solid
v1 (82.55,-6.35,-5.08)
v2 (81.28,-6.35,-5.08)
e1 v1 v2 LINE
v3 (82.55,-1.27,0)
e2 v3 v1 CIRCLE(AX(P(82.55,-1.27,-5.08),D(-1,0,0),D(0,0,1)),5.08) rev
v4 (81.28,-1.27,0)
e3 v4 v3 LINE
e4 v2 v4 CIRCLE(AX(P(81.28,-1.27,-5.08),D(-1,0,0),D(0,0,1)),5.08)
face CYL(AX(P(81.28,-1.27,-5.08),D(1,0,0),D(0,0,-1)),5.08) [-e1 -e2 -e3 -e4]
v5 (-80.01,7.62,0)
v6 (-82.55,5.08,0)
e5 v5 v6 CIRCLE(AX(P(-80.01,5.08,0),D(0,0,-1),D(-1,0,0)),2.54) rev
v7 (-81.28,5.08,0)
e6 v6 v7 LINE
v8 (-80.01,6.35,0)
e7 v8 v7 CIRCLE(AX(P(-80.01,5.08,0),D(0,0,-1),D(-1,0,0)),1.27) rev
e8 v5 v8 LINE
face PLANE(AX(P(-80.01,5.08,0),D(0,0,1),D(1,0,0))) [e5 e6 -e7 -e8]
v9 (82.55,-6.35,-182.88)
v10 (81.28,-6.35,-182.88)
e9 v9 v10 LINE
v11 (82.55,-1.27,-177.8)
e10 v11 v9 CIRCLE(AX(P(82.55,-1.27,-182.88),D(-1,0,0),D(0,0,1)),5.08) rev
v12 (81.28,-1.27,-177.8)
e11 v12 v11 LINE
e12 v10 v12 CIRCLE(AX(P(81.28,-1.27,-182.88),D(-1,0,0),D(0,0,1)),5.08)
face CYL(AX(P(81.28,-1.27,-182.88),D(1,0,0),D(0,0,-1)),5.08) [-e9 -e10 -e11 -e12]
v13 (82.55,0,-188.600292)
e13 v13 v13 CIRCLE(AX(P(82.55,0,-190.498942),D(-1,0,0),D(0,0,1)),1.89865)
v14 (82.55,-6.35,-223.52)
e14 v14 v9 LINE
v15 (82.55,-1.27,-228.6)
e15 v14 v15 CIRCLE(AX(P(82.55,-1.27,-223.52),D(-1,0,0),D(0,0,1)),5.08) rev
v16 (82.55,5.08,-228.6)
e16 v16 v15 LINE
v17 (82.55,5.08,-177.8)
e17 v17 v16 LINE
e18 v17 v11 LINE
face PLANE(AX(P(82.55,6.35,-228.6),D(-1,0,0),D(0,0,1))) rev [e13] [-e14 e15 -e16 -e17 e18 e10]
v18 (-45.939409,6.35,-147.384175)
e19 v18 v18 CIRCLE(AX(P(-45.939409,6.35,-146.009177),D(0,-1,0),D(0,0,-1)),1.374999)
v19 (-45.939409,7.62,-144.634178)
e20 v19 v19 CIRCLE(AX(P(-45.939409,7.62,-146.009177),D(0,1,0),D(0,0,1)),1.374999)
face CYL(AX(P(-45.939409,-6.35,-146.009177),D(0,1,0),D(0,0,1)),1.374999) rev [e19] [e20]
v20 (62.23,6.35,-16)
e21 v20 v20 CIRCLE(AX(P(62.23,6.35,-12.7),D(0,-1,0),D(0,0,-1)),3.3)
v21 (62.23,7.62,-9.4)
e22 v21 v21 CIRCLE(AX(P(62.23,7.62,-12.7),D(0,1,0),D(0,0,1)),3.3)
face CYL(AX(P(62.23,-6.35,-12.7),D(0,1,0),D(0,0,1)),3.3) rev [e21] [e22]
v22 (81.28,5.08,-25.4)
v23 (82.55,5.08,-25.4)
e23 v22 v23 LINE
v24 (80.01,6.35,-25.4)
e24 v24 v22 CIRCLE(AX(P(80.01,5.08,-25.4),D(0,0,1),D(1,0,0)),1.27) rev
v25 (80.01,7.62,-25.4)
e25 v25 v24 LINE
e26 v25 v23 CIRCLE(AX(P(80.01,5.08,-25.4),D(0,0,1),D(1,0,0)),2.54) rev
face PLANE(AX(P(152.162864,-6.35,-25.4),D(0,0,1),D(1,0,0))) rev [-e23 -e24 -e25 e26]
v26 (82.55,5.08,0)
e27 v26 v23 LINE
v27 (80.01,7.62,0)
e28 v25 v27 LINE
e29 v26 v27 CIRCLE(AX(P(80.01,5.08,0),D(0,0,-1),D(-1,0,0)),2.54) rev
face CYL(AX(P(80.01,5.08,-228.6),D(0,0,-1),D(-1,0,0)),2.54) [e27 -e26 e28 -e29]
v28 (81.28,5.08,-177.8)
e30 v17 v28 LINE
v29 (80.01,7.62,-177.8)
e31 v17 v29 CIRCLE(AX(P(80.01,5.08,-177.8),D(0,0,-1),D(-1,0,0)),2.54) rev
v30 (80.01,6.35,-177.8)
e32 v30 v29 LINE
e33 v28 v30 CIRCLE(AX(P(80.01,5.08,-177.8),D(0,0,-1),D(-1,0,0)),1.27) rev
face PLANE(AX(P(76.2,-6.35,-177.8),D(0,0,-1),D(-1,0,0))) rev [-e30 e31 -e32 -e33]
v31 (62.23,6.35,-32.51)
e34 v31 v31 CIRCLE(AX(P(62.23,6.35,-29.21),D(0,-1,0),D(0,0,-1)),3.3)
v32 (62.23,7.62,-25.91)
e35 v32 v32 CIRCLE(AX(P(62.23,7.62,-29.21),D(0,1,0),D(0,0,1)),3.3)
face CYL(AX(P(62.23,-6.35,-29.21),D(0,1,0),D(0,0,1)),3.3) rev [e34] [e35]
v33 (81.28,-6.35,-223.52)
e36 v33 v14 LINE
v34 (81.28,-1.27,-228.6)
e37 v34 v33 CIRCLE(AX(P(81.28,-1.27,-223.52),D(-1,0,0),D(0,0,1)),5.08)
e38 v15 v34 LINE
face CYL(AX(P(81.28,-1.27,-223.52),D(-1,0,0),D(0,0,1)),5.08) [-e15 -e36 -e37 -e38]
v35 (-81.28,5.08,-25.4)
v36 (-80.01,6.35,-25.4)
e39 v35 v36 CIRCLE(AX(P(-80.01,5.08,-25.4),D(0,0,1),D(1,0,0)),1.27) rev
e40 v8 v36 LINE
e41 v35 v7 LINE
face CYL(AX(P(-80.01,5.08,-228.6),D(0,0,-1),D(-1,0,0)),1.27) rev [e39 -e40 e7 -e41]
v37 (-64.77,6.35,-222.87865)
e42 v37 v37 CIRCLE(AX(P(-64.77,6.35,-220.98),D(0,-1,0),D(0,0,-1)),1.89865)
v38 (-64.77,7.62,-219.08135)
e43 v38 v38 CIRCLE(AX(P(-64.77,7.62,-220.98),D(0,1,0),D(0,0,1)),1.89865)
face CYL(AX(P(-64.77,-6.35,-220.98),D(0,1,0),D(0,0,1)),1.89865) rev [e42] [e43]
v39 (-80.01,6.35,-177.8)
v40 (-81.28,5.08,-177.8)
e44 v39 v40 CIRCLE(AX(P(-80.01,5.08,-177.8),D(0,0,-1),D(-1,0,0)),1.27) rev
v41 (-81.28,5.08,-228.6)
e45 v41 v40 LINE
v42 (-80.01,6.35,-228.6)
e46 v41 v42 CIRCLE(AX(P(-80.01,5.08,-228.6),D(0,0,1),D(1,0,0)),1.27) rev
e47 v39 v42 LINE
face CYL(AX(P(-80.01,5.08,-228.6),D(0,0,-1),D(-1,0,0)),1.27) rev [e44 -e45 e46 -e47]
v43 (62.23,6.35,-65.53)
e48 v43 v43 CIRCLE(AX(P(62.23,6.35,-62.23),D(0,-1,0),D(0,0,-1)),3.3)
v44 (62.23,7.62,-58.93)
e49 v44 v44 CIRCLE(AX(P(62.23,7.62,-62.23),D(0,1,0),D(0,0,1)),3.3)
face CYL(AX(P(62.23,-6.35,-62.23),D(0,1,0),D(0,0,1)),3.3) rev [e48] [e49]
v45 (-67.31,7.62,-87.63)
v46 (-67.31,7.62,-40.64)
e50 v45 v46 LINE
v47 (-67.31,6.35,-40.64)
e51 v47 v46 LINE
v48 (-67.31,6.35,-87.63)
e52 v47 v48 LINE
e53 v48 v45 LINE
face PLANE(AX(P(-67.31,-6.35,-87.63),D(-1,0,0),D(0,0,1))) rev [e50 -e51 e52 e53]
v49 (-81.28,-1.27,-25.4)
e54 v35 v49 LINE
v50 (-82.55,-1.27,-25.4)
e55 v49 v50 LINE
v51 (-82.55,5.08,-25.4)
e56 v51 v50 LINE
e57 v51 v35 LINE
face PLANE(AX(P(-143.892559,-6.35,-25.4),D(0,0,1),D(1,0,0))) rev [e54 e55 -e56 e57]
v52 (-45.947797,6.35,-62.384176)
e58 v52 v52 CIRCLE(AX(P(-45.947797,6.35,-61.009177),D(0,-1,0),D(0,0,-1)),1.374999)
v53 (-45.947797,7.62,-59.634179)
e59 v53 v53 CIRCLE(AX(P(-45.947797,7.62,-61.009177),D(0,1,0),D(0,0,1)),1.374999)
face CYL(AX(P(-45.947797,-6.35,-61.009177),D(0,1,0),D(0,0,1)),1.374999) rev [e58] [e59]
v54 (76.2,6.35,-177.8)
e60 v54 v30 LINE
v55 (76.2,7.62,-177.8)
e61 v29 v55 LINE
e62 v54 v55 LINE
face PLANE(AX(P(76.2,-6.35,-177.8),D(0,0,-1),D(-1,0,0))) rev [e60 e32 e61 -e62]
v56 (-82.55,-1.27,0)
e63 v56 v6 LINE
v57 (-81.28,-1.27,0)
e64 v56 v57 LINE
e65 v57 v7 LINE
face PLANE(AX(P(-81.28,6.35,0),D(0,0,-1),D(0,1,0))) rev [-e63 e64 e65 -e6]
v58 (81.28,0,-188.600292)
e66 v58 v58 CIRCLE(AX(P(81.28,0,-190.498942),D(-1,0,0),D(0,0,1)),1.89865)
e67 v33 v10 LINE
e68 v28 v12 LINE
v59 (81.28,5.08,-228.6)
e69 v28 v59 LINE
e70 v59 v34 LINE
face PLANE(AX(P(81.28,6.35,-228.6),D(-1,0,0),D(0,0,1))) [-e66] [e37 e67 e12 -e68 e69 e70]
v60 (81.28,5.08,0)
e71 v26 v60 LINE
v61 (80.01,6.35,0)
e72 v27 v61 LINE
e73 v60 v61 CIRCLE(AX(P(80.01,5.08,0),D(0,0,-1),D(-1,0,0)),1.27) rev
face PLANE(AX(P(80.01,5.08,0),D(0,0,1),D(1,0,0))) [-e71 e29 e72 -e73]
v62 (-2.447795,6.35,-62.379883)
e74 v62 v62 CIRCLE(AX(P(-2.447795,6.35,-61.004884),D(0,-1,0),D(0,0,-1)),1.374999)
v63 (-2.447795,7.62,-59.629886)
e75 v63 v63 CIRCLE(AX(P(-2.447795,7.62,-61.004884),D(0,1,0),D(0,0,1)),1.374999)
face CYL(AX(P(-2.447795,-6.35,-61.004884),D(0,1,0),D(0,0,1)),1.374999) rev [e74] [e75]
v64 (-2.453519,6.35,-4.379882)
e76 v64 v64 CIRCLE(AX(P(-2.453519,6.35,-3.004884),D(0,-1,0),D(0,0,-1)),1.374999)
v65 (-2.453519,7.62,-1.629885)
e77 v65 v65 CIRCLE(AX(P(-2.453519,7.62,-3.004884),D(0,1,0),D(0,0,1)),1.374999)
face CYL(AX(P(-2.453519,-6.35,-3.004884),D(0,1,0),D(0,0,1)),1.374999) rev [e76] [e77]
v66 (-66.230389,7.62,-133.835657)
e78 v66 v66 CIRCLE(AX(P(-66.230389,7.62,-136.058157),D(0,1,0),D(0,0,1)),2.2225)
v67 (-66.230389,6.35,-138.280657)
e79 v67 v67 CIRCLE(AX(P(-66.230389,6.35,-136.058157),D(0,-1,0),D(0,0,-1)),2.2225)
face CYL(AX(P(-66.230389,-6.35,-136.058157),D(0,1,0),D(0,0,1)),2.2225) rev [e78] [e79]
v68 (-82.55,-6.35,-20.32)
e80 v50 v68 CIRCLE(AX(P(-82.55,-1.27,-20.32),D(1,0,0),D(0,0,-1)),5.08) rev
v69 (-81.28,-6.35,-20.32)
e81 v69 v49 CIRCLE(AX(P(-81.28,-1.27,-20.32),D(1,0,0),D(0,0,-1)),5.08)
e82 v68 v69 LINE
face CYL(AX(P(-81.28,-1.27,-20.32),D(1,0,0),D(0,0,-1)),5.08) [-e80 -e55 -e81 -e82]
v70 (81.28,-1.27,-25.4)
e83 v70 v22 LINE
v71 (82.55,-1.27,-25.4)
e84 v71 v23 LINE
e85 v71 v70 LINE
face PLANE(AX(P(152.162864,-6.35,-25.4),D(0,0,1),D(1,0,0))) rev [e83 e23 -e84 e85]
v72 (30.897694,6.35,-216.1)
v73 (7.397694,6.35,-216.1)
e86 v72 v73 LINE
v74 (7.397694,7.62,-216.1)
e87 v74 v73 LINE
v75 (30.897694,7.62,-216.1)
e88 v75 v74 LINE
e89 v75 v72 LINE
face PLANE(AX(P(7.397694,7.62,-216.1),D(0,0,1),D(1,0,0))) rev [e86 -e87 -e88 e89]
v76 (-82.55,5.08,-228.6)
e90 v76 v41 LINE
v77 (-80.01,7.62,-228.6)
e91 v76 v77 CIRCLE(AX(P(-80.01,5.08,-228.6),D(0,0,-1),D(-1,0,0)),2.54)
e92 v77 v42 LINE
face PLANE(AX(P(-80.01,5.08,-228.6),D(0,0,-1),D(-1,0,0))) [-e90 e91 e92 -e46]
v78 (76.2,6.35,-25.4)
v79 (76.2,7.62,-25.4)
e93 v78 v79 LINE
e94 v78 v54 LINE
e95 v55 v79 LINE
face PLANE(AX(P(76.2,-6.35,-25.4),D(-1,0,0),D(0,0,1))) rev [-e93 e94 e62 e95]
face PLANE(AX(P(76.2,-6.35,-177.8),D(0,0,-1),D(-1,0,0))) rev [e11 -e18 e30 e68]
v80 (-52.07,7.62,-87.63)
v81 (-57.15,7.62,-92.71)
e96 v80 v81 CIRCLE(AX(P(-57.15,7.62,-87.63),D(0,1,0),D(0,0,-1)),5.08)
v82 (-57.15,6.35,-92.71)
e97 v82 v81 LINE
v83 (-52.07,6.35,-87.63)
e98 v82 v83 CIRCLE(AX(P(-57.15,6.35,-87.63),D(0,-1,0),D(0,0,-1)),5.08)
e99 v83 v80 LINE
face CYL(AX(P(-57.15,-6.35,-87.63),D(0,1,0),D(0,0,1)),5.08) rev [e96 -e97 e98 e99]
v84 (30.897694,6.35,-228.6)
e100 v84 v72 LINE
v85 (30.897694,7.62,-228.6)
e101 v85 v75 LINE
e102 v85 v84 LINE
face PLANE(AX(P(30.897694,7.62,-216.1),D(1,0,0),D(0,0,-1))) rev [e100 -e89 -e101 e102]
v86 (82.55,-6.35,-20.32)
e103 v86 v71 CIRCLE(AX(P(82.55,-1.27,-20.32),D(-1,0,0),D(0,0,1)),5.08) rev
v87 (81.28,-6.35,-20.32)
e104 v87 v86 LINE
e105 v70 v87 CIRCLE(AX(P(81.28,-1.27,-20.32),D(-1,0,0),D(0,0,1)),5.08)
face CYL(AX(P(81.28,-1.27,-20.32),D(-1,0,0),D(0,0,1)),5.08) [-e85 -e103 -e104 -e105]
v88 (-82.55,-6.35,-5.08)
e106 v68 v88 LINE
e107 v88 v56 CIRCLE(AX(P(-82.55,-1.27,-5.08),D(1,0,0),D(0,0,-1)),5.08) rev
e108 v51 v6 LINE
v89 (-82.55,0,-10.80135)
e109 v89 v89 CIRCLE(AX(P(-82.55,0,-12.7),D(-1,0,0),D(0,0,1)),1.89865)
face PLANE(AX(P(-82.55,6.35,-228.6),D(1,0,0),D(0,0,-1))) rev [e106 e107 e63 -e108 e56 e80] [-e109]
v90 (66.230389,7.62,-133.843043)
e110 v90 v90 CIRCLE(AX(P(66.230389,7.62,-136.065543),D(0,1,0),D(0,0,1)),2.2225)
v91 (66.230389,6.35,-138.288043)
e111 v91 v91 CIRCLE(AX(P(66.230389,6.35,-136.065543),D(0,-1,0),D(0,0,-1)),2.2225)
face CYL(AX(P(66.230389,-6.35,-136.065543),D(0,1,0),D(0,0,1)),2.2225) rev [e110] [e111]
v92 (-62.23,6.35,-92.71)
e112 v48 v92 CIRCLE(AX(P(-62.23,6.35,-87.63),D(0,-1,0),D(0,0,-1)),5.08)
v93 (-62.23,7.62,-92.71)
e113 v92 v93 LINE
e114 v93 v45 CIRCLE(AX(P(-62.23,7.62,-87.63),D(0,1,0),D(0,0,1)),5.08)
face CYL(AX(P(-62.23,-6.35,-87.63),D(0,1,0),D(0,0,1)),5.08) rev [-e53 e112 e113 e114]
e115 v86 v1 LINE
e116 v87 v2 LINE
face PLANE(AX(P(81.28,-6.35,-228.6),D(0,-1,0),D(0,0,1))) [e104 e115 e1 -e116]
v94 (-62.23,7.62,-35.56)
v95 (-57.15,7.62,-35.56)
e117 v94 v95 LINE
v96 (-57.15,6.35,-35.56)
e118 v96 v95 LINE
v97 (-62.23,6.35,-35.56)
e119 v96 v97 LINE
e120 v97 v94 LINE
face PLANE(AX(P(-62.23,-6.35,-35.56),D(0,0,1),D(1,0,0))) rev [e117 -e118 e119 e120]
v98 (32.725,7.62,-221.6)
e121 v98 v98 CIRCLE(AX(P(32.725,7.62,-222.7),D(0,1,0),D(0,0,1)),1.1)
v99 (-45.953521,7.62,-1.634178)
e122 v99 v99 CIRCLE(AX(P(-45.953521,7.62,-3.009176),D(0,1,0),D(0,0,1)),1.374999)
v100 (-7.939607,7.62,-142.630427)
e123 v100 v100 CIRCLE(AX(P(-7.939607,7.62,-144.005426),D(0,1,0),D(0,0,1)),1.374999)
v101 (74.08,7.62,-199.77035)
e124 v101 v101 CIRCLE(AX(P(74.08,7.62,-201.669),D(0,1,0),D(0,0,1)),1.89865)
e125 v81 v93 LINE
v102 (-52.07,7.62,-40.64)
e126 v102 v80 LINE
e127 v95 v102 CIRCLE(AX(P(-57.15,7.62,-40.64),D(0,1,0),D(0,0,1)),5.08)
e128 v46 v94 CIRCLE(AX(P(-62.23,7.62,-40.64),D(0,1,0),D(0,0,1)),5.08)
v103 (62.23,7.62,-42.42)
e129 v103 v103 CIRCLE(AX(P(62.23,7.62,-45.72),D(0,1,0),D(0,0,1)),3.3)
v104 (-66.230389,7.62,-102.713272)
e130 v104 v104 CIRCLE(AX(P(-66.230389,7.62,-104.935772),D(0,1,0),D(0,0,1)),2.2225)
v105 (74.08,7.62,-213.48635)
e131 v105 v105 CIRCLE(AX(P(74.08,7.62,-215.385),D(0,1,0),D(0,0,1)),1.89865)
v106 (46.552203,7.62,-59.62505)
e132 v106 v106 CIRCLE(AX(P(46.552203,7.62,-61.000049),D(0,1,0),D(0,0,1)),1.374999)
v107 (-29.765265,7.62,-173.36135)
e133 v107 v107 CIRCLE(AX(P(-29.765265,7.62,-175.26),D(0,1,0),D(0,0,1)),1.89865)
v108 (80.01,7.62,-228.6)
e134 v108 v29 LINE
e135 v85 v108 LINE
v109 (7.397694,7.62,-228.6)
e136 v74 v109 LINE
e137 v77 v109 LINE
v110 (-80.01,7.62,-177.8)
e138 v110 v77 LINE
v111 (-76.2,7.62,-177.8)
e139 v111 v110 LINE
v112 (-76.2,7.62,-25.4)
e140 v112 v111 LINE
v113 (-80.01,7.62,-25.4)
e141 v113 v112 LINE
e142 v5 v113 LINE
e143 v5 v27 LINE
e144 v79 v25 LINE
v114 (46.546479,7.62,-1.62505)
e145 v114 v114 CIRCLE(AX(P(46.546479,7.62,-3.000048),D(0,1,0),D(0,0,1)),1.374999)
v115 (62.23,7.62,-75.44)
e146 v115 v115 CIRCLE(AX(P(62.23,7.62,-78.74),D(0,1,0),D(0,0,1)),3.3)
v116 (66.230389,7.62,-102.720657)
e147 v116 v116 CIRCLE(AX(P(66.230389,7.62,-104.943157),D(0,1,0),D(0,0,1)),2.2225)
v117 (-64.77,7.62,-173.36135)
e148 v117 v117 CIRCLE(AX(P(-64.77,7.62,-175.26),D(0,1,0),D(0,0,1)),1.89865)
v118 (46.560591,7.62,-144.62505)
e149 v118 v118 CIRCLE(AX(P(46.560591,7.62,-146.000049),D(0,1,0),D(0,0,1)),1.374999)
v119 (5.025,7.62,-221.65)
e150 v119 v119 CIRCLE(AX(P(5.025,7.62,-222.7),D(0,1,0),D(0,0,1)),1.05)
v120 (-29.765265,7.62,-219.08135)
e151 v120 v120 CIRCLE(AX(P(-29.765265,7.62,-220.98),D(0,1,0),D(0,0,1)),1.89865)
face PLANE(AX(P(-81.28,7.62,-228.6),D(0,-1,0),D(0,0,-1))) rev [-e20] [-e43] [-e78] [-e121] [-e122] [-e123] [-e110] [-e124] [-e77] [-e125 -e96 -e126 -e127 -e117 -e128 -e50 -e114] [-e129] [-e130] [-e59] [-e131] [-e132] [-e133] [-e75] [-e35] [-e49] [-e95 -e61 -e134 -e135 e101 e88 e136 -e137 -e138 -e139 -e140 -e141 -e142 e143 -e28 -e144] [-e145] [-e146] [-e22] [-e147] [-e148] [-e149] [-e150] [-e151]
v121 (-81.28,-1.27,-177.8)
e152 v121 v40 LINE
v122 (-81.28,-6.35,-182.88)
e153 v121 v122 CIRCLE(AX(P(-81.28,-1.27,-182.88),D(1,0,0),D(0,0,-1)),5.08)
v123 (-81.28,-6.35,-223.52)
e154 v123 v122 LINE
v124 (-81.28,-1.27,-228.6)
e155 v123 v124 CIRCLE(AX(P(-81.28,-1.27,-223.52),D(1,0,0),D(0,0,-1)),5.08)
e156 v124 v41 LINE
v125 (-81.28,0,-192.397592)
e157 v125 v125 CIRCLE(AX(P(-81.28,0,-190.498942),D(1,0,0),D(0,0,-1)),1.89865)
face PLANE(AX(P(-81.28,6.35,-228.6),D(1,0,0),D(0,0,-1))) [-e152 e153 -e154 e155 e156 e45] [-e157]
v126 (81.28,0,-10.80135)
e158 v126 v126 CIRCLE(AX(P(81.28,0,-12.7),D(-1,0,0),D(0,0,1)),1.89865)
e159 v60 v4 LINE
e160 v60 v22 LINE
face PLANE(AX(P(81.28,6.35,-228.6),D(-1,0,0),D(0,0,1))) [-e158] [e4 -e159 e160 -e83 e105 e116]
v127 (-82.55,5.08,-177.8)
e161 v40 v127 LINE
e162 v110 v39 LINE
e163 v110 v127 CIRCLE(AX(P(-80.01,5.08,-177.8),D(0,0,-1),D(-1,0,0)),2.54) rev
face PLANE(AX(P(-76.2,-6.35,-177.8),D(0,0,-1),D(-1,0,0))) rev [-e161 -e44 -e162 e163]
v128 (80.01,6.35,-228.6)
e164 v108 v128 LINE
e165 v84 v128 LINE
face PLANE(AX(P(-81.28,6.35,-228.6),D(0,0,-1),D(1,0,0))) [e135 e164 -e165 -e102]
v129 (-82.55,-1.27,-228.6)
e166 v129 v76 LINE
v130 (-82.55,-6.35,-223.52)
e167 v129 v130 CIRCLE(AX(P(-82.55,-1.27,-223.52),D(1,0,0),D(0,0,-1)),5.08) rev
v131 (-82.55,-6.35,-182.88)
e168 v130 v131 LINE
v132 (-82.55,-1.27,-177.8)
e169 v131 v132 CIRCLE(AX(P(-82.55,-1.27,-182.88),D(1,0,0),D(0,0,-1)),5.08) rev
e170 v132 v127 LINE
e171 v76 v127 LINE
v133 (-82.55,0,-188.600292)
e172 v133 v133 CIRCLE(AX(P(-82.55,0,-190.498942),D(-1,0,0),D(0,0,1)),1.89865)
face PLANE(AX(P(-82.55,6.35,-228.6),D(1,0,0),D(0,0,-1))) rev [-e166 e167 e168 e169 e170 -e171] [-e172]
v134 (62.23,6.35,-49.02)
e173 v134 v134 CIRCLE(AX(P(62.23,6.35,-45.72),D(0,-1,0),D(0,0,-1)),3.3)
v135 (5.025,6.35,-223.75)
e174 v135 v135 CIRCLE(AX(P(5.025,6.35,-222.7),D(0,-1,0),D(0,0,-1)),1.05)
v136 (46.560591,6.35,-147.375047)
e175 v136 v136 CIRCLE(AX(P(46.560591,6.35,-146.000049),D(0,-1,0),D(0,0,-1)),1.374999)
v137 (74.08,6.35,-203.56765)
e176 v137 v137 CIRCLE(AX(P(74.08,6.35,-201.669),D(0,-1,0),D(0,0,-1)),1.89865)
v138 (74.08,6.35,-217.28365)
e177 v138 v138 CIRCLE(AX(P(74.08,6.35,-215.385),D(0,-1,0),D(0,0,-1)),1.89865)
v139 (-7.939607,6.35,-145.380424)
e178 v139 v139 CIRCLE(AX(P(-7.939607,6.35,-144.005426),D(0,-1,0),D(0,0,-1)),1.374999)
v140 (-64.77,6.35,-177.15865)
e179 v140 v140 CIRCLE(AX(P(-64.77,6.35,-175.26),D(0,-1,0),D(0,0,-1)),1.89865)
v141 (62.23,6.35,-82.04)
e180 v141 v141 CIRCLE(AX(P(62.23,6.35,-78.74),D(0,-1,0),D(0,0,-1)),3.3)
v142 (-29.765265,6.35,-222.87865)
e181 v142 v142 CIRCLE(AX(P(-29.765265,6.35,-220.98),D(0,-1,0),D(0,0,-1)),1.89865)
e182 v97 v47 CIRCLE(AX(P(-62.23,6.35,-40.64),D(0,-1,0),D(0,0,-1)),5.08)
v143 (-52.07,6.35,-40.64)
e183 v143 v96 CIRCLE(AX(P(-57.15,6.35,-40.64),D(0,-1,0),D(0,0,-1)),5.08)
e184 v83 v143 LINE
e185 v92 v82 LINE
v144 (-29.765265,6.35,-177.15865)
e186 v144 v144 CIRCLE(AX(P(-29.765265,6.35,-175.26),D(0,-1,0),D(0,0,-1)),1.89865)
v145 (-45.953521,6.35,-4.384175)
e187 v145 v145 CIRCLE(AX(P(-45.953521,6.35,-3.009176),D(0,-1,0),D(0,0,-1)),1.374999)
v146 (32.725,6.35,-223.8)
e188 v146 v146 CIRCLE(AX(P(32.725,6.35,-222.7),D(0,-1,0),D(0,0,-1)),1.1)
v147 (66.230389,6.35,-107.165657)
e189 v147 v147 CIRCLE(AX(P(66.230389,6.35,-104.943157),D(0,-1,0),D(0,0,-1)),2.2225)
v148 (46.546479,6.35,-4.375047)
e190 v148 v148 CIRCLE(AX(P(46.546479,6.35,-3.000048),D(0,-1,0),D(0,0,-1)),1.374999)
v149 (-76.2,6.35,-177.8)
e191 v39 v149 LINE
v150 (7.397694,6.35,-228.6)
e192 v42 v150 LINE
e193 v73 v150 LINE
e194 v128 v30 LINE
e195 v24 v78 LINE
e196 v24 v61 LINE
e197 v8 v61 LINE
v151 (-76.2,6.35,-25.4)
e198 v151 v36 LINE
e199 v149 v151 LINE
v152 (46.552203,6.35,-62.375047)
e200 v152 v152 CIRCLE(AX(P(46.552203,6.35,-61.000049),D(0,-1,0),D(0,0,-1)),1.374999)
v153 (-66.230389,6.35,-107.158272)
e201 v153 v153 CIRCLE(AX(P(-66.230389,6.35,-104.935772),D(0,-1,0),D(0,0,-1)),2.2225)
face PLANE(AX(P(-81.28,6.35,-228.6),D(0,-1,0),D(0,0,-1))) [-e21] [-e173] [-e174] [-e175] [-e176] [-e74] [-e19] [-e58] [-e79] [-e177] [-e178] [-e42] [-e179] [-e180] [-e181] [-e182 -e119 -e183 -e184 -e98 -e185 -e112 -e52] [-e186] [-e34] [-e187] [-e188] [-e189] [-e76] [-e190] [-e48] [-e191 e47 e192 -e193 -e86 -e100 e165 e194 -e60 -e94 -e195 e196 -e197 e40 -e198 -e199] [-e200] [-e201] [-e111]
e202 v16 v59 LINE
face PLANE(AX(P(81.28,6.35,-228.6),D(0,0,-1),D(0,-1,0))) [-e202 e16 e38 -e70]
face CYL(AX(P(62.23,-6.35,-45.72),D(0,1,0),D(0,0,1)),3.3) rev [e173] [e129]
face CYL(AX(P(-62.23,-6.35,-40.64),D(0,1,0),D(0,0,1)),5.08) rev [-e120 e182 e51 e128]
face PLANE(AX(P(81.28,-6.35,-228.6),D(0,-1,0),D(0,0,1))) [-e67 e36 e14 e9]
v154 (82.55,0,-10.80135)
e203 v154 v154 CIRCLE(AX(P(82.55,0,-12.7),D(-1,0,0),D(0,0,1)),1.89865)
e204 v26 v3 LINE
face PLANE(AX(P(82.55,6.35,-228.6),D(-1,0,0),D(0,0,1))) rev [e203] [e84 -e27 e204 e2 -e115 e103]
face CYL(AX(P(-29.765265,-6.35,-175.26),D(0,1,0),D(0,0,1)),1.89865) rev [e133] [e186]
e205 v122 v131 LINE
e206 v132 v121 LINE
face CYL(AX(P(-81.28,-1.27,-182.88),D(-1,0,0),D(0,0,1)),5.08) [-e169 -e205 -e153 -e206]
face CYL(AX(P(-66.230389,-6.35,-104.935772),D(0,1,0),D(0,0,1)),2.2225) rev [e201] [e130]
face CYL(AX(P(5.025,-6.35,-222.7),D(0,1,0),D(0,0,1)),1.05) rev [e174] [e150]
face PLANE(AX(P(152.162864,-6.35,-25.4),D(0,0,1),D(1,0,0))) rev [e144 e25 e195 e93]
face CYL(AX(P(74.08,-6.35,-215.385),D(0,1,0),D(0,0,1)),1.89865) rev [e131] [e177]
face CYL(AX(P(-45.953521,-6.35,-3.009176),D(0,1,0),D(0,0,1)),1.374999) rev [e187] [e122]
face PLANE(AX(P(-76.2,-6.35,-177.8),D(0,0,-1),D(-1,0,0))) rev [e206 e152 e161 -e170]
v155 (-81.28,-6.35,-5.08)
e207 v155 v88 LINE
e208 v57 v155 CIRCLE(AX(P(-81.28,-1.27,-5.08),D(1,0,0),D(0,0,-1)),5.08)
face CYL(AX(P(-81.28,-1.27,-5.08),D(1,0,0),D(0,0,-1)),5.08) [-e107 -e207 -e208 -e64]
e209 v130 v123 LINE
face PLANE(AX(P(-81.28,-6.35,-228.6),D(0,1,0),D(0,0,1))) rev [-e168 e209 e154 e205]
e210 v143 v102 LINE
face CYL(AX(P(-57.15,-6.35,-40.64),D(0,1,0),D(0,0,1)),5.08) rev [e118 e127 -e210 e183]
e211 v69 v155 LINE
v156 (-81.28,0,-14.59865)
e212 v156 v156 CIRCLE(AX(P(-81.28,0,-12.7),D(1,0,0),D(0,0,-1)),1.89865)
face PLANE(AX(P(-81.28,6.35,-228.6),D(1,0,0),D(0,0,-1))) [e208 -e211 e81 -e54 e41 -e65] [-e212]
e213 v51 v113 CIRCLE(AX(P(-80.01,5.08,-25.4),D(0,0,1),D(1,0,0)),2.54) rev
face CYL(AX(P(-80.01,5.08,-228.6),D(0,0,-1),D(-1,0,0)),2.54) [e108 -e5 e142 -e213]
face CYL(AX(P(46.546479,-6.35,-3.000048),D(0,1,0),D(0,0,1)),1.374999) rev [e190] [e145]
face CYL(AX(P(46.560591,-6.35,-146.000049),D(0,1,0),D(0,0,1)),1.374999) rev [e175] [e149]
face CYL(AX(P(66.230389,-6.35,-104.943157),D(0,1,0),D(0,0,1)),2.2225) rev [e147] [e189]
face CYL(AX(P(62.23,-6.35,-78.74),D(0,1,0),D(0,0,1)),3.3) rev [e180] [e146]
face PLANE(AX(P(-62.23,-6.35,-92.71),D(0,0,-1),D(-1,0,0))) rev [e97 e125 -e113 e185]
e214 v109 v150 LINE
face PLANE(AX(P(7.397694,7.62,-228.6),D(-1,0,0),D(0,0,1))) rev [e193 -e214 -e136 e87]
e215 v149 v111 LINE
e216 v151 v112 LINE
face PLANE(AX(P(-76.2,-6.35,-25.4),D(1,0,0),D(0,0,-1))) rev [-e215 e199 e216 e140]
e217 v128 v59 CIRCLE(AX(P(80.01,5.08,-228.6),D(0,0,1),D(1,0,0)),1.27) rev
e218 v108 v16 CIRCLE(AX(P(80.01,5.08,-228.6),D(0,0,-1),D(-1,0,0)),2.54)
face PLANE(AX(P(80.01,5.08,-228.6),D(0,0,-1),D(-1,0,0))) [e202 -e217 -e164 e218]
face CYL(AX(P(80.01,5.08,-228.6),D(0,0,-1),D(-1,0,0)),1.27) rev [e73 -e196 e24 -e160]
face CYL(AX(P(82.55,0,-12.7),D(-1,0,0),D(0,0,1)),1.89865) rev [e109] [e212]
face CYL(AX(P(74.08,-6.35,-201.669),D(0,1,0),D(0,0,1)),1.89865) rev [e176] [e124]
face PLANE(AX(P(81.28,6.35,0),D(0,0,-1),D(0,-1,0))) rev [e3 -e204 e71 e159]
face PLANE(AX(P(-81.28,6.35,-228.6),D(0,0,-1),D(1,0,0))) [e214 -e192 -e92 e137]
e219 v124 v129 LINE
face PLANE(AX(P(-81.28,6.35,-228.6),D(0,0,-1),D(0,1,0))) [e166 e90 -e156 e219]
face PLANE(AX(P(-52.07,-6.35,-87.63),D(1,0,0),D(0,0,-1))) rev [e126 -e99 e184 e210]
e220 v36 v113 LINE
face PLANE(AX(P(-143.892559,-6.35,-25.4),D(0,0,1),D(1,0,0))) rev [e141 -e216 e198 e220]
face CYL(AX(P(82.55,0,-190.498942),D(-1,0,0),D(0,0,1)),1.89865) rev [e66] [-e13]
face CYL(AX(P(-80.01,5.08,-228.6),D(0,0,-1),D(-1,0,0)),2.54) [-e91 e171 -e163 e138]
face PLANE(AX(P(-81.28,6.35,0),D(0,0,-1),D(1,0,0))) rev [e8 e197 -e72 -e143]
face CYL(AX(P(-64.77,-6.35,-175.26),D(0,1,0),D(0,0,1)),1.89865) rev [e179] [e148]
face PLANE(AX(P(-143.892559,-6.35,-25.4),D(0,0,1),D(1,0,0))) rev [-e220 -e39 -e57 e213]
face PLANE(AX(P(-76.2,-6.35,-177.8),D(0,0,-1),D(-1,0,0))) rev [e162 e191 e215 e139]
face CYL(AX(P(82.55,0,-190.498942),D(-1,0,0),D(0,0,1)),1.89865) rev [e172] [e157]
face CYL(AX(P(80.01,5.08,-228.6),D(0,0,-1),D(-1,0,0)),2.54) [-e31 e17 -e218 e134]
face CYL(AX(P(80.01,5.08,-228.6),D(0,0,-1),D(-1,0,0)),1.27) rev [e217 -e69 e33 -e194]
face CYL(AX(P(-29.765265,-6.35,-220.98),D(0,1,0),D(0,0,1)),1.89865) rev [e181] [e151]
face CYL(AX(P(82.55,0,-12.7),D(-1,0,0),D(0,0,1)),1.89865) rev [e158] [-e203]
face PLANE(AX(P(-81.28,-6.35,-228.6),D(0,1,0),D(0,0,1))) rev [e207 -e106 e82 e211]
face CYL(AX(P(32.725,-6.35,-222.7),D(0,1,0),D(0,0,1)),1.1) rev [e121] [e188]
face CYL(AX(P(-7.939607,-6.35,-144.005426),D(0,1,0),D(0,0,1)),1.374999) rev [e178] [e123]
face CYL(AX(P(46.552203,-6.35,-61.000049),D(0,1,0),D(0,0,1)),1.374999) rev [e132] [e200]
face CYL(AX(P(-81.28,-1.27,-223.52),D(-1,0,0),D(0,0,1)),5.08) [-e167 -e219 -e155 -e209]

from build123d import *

# Parameters (mm, degrees)
BOSS_EXTRUDE1_DEPTH    = 228.6
CONVERT_SOLID1_START   = -228.6
CONVERT_SOLID1_DEPTH   = 228.6
CONVERT_SOLID1_2_DEPTH = 228.6
SKETCH2_W              = 67.692558519
SKETCH2_H              = 152.4
SKETCH2_W_2            = 75.962864449
CUT_EXTRUDE1_DEPTH     = 244.449426781
SKETCH3_R              = 1.89865
CUT_EXTRUDE2_DEPTH     = 283.088699526
SKETCH4_R              = 2.2225
SKETCH4_R_2            = 1.89865
CUT_EXTRUDE3_DEPTH     = 244.449426781
SKETCH5_R              = 1.89865
CUT_EXTRUDE4_DEPTH     = 244.449426781
CUT_EXTRUDE5_DEPTH     = 244.379852289
SKETCH7_R              = 1.1
SKETCH7_R_2            = 1.05
CUT_EXTRUDE6_DEPTH     = 244.449426781
SKETCH8_R              = 1.37499852
CUT_EXTRUDE7_DEPTH     = 244.449426781
CUT_EXTRUDE8_DEPTH     = 244.449426781
SKETCH10_R             = 3.3
CUT_EXTRUDE9_DEPTH     = 244.449426781
FILLET1_R              = 5.08


# Read off the part's stored shape, not the designer's step: Convert-Solid1
with BuildPart() as part:
    # Sketch1 → Boss-Extrude1 (new body)
    with BuildSketch(Plane.XY):
        Polygon((82.55, 7.62), (82.55, -6.35), (81.28, -6.35), (81.28, 6.35), (-81.28, 6.35), (-81.28, -6.35), (-82.55, -6.35), (-82.55, 7.62), align=None)
    extrude(amount=-BOSS_EXTRUDE1_DEPTH)

    # Convert-Solid1 outline → Convert-Solid1 (cut)
    with BuildSketch(Plane.XY.offset(CONVERT_SOLID1_START)):
        with BuildLine():
            Line((82.55, 7.62), (80.01, 7.62))
            ThreePointArc((80.01, 7.62), (81.806051224, 6.876051224), (82.55, 5.08))
            Line((82.55, 5.08), (82.55, 7.62))
        make_face()
        with BuildLine():
            ThreePointArc((-82.55, 5.08), (-81.806051224, 6.876051224), (-80.01, 7.62))
            Line((-80.01, 7.62), (-82.55, 7.62))
            Line((-82.55, 7.62), (-82.55, 5.08))
        make_face()
    extrude(amount=CONVERT_SOLID1_DEPTH, mode=Mode.SUBTRACT)

    # Convert-Solid1 2 outline → Convert-Solid1 2 (add)
    with BuildSketch(Plane.XY.offset(CONVERT_SOLID1_START)):
        with BuildLine():
            Line((81.28, 6.35), (80.01, 6.35))
            ThreePointArc((80.01, 6.35), (80.908025612, 5.978025612), (81.28, 5.08))
            Line((81.28, 5.08), (81.28, 6.35))
        make_face()
        with BuildLine():
            ThreePointArc((-81.28, 5.08), (-80.908025612, 5.978025612), (-80.01, 6.35))
            Line((-80.01, 6.35), (-81.28, 6.35))
            Line((-81.28, 6.35), (-81.28, 5.08))
        make_face()
    extrude(amount=CONVERT_SOLID1_2_DEPTH)

    # Sketch2 → Cut-Extrude1 (cut, through all)
    with BuildSketch(Plane(origin=(0, 7.62, 0), x_dir=(1, 0, 0), z_dir=(0, 1, 0))):
        with Locations((-110.04627926, 101.6)):
            Rectangle(SKETCH2_W, SKETCH2_H)
        with Locations((114.181432225, 101.6)):
            Rectangle(SKETCH2_W_2, SKETCH2_H)
    extrude(amount=-CUT_EXTRUDE1_DEPTH, mode=Mode.SUBTRACT)

    # Sketch3 → Cut-Extrude2 (cut, through all)
    with BuildSketch(Plane.ZY.offset(82.55)):
        with Locations((-12.7, 0)):
            Circle(SKETCH3_R)
        with Locations((-190.498941664, 0)):
            Circle(SKETCH3_R)
    extrude(amount=-CUT_EXTRUDE2_DEPTH, mode=Mode.SUBTRACT)

    # Sketch4 → Cut-Extrude3 (cut, through all)
    with BuildSketch(Plane(origin=(0, 7.62, 0), x_dir=(1, 0, 0), z_dir=(0, 1, 0))):
        with Locations(Location((-66.230388698, 104.935772071, 0), (0, 0, 270))):
            Circle(SKETCH4_R)
        with Locations(Location((-66.230388698, 136.058157483, 0), (0, 0, 270))):
            Circle(SKETCH4_R)
        with Locations(Location((66.230388698, 104.943157483, 0), (0, 0, 270))):
            Circle(SKETCH4_R)
        with Locations(Location((66.230388698, 136.065542896, 0), (0, 0, 270))):
            Circle(SKETCH4_R)
        with Locations(Location((-64.77, 175.26, 0), (0, 0, 270))):
            Circle(SKETCH4_R_2)
        with Locations(Location((-29.765265396, 175.26, 0), (0, 0, 270))):
            Circle(SKETCH4_R_2)
        with Locations(Location((-64.77, 220.98, 0), (0, 0, 270))):
            Circle(SKETCH4_R_2)
        with Locations(Location((-29.765265396, 220.98, 0), (0, 0, 270))):
            Circle(SKETCH4_R_2)
    extrude(amount=-CUT_EXTRUDE3_DEPTH, mode=Mode.SUBTRACT)

    # Sketch5 → Cut-Extrude4 (cut, through all)
    with BuildSketch(Plane(origin=(0, 7.62, 0), x_dir=(1, 0, 0), z_dir=(0, 1, 0))):
        with Locations(Location((74.08, 215.385, 0), (0, 0, 270))):
            Circle(SKETCH5_R)
        with Locations(Location((74.08, 201.669, 0), (0, 0, 270))):
            Circle(SKETCH5_R)
    extrude(amount=-CUT_EXTRUDE4_DEPTH, mode=Mode.SUBTRACT)

    # Sketch6 → Cut-Extrude5 (cut, through all)
    with BuildSketch(Plane.XZ.offset(-6.35)):
        Polygon((7.397693639, -228.6), (7.397693639, -216.1), (30.897693639, -216.1), (30.897693639, -228.6), (32.459774255, -235.098021795), (8.736104366, -236.048499643), (7.834861371, -236.048499643), align=None)
    extrude(amount=-CUT_EXTRUDE5_DEPTH, mode=Mode.SUBTRACT)

    # Sketch7 → Cut-Extrude6 (cut, through all)
    with BuildSketch(Plane(origin=(0, 7.62, 0), x_dir=(1, 0, 0), z_dir=(0, 1, 0))):
        with Locations(Location((32.725, 222.7, 0), (0, 0, 270))):
            Circle(SKETCH7_R)
        with Locations(Location((5.025, 222.7, 0), (0, 0, 270))):
            Circle(SKETCH7_R_2)
    extrude(amount=-CUT_EXTRUDE6_DEPTH, mode=Mode.SUBTRACT)

    # Sketch8 → Cut-Extrude7 (cut, through all)
    with BuildSketch(Plane(origin=(0, 7.62, 0), x_dir=(1, 0, 0), z_dir=(0, 1, 0))):
        with Locations(Location((46.560590793, 146.00004873, 0), (0, 0, 270))):
            Circle(SKETCH8_R)
        with Locations(Location((-7.939606525, 144.005425812, 0), (0, 0, 270))):
            Circle(SKETCH8_R)
        with Locations(Location((-45.939409177, 146.009176787, 0), (0, 0, 270))):
            Circle(SKETCH8_R)
        with Locations(Location((-45.947797121, 61.009177021, 0), (0, 0, 270))):
            Circle(SKETCH8_R)
        with Locations(Location((-2.447795433, 61.004884367, 0), (0, 0, 270))):
            Circle(SKETCH8_R)
        with Locations(Location((46.552202848, 61.000048964, 0), (0, 0, 270))):
            Circle(SKETCH8_R)
        with Locations(Location((46.54647931, 3.000048406, 0), (0, 0, 270))):
            Circle(SKETCH8_R)
        with Locations(Location((-2.453518972, 3.00488381, 0), (0, 0, 270))):
            Circle(SKETCH8_R)
        with Locations(Location((-45.95352066, 3.009176464, 0), (0, 0, 270))):
            Circle(SKETCH8_R)
    extrude(amount=-CUT_EXTRUDE7_DEPTH, mode=Mode.SUBTRACT)

    # Sketch9 → Cut-Extrude8 (cut, through all)
    with BuildSketch(Plane(origin=(0, 7.62, 0), x_dir=(1, 0, 0), z_dir=(0, 1, 0))):
        with BuildLine():
            Line((-62.23, 92.71), (-57.15, 92.71))
            ThreePointArc((-57.15, 92.71), (-53.557897552, 91.222102448), (-52.07, 87.63))
            Line((-52.07, 87.63), (-52.07, 40.64))
            ThreePointArc((-52.07, 40.64), (-53.557897552, 37.047897552), (-57.15, 35.56))
            Line((-57.15, 35.56), (-62.23, 35.56))
            ThreePointArc((-62.23, 35.56), (-65.822102448, 37.047897552), (-67.31, 40.64))
            Line((-67.31, 40.64), (-67.31, 87.63))
            ThreePointArc((-67.31, 87.63), (-65.822102448, 91.222102448), (-62.23, 92.71))
        make_face()
    extrude(amount=-CUT_EXTRUDE8_DEPTH, mode=Mode.SUBTRACT)

    # Sketch10 → Cut-Extrude9 (cut, through all)
    with BuildSketch(Plane(origin=(0, 7.62, 0), x_dir=(1, 0, 0), z_dir=(0, 1, 0))):
        with Locations(Location((62.23, 12.7, 0), (0, 0, 270))):
            Circle(SKETCH10_R)
        with Locations(Location((62.23, 29.21, 0), (0, 0, 270))):
            Circle(SKETCH10_R)
        with Locations(Location((62.23, 45.72, 0), (0, 0, 270))):
            Circle(SKETCH10_R)
        with Locations(Location((62.23, 62.23, 0), (0, 0, 270))):
            Circle(SKETCH10_R)
        with Locations(Location((62.23, 78.74, 0), (0, 0, 270))):
            Circle(SKETCH10_R)
    extrude(amount=-CUT_EXTRUDE9_DEPTH, mode=Mode.SUBTRACT)

    # Fillet1
    fillet1_edges = [part.edges().sort_by_distance(p)[0] for p in [
        (81.915, -6.35, 0),
        (81.915, -6.35, -228.6),
        (-81.915, -6.35, -228.6),
        (-81.915, -6.35, 0),
        (-81.915, -6.35, -25.4),
        (-81.915, -6.35, -177.8),
        (81.915, -6.35, -25.4),
        (81.915, -6.35, -177.8),
    ]]
    fillet(fillet1_edges, radius=FILLET1_R)


solid = part.part
